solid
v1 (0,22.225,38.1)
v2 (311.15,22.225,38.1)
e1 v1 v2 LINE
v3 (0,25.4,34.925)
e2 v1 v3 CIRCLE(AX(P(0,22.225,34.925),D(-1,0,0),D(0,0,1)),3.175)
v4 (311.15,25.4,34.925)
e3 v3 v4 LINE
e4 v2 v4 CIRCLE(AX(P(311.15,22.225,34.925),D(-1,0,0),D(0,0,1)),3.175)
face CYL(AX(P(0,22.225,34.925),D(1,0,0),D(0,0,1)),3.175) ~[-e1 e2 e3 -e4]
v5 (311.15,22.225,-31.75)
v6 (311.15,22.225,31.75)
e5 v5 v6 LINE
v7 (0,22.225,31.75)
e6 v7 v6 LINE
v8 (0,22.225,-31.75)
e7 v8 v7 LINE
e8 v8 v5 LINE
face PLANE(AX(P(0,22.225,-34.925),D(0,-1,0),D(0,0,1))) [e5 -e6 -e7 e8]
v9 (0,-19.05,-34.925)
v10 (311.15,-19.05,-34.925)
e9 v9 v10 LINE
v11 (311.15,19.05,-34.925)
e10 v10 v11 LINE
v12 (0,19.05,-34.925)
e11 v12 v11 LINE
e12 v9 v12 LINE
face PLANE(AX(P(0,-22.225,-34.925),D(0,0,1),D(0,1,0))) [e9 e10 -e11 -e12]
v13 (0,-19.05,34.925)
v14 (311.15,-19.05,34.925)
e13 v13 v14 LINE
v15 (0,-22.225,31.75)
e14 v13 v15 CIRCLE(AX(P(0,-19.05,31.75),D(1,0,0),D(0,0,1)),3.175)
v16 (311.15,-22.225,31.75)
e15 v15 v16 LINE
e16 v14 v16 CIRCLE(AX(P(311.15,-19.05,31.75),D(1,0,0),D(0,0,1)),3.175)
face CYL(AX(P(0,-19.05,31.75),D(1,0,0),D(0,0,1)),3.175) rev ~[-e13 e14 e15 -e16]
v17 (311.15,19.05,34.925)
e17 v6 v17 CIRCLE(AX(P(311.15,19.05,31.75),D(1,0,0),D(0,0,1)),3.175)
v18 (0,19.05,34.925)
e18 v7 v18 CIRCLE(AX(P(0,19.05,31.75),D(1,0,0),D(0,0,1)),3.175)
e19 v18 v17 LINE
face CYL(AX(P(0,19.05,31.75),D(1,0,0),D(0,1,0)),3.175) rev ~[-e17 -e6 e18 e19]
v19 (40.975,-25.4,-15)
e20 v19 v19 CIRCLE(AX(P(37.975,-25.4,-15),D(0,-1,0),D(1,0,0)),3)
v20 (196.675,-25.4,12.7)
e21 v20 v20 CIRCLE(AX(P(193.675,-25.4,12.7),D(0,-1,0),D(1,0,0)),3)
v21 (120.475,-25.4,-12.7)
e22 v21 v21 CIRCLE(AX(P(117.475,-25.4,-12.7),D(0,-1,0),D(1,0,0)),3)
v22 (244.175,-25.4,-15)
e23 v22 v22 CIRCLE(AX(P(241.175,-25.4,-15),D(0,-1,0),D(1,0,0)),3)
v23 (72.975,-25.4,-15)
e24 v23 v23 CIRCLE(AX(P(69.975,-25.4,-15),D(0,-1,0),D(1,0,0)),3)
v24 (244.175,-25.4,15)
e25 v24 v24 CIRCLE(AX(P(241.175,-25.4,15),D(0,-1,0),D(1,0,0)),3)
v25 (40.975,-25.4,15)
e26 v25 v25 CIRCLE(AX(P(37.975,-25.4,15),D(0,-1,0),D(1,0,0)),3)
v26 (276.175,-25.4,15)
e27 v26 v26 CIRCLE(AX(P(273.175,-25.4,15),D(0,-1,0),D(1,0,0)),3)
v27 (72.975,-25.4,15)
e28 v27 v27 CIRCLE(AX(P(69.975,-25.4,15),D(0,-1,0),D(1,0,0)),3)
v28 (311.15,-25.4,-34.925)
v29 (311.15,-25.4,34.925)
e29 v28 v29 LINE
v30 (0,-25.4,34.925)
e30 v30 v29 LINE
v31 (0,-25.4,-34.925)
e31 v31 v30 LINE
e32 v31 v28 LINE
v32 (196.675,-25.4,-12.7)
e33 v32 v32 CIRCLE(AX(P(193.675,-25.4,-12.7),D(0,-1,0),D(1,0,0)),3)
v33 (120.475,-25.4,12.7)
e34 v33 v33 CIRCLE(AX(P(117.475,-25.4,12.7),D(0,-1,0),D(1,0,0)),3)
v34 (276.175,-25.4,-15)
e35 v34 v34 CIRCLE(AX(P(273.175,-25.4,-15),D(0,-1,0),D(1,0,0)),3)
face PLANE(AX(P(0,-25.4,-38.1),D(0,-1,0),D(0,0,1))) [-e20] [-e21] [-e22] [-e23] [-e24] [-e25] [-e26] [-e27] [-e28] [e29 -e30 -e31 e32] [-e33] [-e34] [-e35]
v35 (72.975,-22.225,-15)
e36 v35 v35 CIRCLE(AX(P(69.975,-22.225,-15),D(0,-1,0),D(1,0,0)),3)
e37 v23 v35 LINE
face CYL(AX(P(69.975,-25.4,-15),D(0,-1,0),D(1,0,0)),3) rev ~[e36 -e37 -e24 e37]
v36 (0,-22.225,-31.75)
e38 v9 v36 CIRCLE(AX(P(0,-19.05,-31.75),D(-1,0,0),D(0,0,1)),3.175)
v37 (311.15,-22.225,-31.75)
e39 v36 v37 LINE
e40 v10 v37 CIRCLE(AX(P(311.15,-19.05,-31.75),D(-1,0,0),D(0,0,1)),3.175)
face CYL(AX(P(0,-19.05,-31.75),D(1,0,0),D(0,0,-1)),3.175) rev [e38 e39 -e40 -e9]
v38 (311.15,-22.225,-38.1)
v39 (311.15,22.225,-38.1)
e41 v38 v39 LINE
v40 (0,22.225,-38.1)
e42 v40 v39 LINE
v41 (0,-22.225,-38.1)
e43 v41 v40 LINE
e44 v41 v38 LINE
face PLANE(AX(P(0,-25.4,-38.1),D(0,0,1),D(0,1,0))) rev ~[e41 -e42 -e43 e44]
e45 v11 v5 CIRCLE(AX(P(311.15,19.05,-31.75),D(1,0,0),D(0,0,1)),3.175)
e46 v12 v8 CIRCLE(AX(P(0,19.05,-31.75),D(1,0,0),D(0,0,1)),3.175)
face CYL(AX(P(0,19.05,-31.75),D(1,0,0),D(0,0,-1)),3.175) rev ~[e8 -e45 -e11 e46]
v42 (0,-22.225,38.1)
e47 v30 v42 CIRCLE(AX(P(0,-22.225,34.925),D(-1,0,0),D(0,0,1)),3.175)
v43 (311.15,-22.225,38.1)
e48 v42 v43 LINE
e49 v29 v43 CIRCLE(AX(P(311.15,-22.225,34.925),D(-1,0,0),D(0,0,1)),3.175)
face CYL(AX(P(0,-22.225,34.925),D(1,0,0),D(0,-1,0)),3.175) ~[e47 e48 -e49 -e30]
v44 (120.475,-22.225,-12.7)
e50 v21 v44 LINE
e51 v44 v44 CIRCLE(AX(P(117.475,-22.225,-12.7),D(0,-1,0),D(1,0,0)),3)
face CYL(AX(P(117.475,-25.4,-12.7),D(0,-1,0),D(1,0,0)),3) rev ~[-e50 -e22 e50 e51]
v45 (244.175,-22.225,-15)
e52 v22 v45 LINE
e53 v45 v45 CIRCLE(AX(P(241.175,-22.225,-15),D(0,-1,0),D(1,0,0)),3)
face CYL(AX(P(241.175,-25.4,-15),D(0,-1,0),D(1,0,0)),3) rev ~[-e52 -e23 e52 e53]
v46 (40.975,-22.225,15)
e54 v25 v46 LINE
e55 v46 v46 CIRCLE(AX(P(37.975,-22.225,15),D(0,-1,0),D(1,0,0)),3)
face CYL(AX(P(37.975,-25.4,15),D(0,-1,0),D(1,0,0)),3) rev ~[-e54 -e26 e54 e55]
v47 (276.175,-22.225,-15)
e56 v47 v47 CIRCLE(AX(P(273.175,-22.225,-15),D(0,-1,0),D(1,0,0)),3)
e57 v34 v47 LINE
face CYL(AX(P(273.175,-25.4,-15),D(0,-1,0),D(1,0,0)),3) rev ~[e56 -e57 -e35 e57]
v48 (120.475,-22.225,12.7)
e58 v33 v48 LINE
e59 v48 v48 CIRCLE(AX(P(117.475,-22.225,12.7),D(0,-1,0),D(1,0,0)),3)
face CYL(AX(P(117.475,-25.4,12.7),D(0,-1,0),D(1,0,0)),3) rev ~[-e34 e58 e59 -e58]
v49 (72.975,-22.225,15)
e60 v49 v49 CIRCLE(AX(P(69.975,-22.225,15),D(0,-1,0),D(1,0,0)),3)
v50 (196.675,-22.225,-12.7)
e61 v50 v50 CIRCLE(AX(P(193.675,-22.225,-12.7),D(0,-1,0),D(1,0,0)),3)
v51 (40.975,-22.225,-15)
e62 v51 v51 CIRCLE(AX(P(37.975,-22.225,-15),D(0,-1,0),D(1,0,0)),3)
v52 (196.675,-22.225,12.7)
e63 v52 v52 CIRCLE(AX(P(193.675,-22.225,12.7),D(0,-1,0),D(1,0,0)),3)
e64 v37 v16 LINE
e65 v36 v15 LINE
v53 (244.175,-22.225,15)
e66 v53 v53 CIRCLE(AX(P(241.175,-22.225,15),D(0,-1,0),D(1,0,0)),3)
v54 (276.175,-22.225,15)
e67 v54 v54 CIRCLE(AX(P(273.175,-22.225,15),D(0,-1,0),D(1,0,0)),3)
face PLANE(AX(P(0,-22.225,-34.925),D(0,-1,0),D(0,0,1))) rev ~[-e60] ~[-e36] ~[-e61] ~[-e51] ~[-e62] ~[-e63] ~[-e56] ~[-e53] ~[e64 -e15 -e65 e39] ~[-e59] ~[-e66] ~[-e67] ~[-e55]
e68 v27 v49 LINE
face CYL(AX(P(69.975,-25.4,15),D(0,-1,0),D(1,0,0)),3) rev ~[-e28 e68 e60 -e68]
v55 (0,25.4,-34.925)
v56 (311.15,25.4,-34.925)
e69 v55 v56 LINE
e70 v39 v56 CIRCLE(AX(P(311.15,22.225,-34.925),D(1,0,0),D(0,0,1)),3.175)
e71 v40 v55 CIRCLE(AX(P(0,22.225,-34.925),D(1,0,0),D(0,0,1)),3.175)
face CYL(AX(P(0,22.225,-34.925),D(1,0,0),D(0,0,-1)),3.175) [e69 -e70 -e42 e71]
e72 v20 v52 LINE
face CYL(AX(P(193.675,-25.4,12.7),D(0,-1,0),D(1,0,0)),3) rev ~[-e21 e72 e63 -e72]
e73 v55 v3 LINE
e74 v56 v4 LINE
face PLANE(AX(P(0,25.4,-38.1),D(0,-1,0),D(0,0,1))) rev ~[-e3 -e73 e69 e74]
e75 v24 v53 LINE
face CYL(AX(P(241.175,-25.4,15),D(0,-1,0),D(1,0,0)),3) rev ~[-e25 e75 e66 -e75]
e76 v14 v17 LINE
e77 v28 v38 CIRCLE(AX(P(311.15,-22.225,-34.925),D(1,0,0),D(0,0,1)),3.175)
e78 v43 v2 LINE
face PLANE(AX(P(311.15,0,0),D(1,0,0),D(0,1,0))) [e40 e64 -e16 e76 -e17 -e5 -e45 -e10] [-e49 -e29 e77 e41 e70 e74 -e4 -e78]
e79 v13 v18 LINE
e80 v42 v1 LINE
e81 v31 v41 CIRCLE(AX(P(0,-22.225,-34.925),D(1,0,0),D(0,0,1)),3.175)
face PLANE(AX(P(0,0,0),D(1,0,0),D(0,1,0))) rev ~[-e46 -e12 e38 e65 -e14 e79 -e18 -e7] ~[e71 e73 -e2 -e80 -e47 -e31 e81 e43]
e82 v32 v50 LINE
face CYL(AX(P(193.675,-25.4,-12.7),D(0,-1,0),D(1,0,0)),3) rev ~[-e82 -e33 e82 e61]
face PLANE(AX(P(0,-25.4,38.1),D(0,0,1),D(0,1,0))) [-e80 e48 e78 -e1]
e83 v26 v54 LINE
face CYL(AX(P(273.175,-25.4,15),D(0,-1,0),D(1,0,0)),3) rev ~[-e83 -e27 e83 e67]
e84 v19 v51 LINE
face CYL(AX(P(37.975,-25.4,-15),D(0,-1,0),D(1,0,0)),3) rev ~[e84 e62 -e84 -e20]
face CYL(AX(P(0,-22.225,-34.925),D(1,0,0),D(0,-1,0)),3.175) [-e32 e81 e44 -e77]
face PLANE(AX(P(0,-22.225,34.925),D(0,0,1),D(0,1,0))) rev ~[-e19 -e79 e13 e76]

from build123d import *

# Parameters (mm, degrees)
F0_W     = 50.8
F0_H     = 76.2
F0_W_2   = 44.45
F0_H_2   = 69.85
F2_DEPTH = 311.15
F3_R     = 3.175
F4_R     = 3
F5_DEPTH = 25.4
F6_DEPTH = 25.4


# Not quite as in the source:
# - a variable given as a bare number and used for a length is read in inches; the dataset says mm whatever the document's units were


with BuildPart() as f2:
    # F0 (on Right) → F2 (new body)
    with BuildSketch(Plane.YZ):
        Rectangle(F0_W, F0_H)
        Rectangle(F0_W_2, F0_H_2, mode=Mode.SUBTRACT)
    extrude(amount=F2_DEPTH)

    # F3
    f3_edges = [f2.edges().sort_by_distance(p)[0] for p in [
        (155.575, -25.4, 38.1),
        (155.575, -22.225, 34.925),
        (155.575, 22.225, 34.925),
        (155.575, 25.4, 38.1),
        (155.575, 25.4, -38.1),
        (155.575, -25.4, -38.1),
        (155.575, 22.225, -34.925),
        (155.575, -22.225, -34.925),
    ]]
    fillet(f3_edges, radius=F3_R)

    # F4 (on face) → F5 (cut)
    with BuildSketch(Plane.XZ.offset(25.4)):
        with Locations((37.975, 15)):
            Circle(F4_R)
        with Locations((69.975, 15)):
            Circle(F4_R)
        with Locations((69.975, -15)):
            Circle(F4_R)
        with Locations((37.975, -15)):
            Circle(F4_R)
        with Locations((241.175, 15)):
            Circle(F4_R)
        with Locations((273.175, 15)):
            Circle(F4_R)
        with Locations((273.175, -15)):
            Circle(F4_R)
        with Locations((241.175, -15)):
            Circle(F4_R)
    extrude(amount=-F5_DEPTH, mode=Mode.SUBTRACT)

    # F4 (on face) → F6 (cut)
    with BuildSketch(Plane.XZ.offset(25.4)):
        with Locations((117.475, 12.7)):
            Circle(F4_R)
        with Locations((117.475, -12.7)):
            Circle(F4_R)
        with Locations((193.675, -12.7)):
            Circle(F4_R)
        with Locations((193.675, 12.7)):
            Circle(F4_R)
    extrude(amount=-F6_DEPTH, mode=Mode.SUBTRACT)


solid = f2.part
